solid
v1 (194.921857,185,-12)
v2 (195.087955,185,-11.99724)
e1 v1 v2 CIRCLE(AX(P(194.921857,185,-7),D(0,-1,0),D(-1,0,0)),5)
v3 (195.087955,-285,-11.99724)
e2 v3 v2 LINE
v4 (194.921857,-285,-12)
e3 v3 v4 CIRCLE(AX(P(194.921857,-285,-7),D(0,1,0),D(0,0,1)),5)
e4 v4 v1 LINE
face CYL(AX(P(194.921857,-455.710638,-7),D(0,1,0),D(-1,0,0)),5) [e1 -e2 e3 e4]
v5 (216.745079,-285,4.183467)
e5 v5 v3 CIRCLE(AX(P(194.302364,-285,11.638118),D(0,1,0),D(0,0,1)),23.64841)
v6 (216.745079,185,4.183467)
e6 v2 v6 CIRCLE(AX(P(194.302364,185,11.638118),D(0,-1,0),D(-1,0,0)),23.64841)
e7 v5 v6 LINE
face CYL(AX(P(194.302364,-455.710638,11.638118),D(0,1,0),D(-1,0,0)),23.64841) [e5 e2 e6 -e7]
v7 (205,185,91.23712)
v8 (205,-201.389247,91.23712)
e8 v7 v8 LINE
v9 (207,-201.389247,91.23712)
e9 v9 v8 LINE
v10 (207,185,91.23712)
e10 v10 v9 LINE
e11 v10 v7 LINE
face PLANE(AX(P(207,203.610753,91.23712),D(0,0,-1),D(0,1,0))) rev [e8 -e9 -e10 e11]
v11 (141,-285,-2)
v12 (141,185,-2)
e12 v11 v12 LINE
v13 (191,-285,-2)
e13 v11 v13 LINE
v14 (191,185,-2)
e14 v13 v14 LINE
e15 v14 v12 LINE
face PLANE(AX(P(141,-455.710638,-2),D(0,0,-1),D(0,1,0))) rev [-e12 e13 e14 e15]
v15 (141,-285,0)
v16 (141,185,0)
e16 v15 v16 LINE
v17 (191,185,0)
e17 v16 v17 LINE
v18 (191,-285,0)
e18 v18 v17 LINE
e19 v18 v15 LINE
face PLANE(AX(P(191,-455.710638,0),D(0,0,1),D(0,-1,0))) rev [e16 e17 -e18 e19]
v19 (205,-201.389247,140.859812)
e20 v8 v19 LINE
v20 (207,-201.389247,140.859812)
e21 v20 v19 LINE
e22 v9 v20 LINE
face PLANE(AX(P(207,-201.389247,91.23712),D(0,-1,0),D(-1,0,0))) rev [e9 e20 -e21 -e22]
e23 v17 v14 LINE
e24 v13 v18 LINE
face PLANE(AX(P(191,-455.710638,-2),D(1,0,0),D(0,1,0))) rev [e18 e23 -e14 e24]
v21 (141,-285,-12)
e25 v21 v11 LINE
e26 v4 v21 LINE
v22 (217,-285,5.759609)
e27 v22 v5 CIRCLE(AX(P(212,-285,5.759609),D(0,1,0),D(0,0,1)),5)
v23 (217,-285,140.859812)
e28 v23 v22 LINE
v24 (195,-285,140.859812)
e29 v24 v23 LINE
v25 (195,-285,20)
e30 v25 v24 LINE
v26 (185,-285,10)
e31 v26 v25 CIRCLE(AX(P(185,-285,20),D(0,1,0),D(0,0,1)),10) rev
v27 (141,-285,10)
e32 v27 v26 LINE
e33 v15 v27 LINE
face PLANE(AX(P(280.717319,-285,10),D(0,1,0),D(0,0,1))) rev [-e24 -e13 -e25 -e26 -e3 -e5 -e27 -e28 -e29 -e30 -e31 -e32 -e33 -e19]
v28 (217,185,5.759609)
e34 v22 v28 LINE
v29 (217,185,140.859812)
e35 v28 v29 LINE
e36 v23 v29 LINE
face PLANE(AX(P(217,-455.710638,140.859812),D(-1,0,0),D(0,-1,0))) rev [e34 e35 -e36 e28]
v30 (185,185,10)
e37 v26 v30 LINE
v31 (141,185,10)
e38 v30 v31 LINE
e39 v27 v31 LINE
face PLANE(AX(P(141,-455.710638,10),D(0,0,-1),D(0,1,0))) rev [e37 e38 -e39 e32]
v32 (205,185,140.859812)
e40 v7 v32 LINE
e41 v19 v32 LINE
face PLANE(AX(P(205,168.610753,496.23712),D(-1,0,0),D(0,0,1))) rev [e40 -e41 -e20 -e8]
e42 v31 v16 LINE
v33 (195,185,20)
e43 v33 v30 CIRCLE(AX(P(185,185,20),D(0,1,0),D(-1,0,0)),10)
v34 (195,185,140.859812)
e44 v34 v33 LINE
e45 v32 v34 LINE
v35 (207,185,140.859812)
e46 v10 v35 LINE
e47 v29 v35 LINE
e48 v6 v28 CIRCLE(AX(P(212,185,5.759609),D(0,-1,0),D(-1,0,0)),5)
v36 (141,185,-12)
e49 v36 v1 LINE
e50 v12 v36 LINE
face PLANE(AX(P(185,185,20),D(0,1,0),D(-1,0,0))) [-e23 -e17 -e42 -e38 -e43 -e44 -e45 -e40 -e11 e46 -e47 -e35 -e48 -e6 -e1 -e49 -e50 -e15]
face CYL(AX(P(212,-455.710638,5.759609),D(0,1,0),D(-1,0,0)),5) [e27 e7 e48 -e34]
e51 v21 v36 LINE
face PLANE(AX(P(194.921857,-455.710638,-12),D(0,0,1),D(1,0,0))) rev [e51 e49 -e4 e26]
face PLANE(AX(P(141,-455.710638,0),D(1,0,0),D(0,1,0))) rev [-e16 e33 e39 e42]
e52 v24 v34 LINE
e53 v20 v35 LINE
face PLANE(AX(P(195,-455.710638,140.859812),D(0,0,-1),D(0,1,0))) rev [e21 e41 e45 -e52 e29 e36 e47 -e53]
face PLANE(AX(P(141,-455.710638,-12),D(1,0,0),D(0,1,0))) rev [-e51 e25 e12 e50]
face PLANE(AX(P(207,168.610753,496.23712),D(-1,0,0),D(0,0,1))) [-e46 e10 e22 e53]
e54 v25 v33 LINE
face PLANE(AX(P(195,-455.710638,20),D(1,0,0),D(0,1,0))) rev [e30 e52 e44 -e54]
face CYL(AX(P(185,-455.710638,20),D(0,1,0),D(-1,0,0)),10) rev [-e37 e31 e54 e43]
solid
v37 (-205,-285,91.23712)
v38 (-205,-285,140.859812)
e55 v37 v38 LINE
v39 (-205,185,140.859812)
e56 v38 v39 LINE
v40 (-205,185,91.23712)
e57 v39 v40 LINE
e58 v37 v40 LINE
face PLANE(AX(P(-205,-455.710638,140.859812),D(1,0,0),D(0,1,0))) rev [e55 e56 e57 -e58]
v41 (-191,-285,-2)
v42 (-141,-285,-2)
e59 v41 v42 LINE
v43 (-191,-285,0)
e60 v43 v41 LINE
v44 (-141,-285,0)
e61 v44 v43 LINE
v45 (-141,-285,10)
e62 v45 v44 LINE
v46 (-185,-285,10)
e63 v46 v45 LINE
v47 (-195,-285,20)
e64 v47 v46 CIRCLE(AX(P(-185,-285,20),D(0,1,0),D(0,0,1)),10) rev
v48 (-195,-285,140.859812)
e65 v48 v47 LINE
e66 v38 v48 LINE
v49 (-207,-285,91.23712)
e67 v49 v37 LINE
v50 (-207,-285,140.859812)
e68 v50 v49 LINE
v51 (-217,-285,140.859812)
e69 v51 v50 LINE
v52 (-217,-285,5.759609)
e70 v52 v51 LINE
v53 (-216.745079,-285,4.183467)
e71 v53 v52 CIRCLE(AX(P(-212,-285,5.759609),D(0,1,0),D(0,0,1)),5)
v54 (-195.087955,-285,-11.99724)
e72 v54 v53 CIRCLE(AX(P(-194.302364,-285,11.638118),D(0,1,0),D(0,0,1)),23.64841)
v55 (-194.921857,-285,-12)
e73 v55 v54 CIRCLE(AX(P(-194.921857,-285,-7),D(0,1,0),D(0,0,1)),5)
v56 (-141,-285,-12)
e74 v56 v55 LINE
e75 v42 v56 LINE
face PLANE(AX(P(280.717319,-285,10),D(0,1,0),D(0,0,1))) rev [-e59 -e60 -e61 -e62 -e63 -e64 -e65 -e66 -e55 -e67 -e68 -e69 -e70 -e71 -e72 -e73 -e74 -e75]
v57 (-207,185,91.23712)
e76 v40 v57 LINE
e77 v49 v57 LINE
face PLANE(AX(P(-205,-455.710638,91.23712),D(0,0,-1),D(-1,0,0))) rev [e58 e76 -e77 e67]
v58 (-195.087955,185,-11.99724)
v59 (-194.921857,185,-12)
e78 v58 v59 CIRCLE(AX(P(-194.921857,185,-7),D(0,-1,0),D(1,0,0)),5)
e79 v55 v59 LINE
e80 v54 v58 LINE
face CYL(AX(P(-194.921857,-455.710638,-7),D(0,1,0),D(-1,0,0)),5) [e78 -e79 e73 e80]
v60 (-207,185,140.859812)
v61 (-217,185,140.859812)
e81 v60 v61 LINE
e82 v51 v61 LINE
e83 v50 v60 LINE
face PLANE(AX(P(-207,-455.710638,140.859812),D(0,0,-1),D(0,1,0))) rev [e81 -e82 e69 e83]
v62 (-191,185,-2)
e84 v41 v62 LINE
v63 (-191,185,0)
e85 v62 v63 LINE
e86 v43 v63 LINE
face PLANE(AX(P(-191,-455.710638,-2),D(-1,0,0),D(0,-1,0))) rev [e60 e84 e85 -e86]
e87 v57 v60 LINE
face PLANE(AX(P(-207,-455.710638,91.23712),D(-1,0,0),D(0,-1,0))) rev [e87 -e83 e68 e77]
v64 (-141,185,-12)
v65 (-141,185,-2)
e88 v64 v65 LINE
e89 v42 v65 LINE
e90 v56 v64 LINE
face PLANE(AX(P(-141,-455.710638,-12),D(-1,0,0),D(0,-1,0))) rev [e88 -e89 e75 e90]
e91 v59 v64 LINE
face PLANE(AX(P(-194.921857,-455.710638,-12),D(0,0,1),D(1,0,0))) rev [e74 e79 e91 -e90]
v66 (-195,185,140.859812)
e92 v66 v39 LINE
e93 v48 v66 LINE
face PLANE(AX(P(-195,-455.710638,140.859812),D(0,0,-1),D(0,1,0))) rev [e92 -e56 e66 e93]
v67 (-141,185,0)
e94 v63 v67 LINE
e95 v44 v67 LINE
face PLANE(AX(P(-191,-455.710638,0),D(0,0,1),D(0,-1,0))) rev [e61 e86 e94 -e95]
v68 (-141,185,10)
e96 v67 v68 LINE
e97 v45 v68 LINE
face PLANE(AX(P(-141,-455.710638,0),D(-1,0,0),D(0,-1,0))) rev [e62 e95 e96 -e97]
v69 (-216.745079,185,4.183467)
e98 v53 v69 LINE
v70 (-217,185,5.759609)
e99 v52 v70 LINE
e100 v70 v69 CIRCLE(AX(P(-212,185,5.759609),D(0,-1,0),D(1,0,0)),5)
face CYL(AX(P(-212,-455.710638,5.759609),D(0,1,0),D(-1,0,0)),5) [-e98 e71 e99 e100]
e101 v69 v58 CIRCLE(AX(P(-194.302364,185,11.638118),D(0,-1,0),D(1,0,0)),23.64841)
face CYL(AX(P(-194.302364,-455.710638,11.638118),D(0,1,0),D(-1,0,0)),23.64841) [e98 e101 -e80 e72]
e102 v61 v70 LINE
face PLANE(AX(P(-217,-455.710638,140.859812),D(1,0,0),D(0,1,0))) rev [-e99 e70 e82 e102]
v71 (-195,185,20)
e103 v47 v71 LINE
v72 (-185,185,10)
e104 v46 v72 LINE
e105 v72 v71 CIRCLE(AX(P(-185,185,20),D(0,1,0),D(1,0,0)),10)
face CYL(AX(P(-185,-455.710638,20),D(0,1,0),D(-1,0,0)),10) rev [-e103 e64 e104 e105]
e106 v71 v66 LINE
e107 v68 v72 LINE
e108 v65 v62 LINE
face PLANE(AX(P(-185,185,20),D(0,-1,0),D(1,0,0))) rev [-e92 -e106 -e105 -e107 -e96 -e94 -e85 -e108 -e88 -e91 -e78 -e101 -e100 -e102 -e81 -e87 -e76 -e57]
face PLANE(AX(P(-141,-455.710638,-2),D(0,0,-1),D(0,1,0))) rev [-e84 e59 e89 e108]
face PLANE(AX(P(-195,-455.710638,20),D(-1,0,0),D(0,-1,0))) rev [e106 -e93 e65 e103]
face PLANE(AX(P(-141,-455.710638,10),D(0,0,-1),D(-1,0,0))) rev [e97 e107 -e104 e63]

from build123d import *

# Parameters (mm, degrees)
BOSS_EXTRUDE1_DEPTH   = 470
BOSS_EXTRUDE1_2_DEPTH = 470
CAVITY1_START         = -201.389246797
CAVITY1_OUTLINE_W     = 2
CAVITY1_OUTLINE_H     = 49.622691928
CAVITY1_DEPTH         = 386.389246797


# Read off the part's stored shape, not the designer's step: Cavity1
with BuildPart() as part:
    # Sketch1 → Boss-Extrude1 (new body)
    with BuildSketch(Plane.XZ.offset(-185)):
        with BuildLine():
            Line((141, 0), (141, 10))
            Line((141, 10), (185, 10))
            ThreePointArc((185, 10), (192.071067812, 12.928932188), (195, 20))
            Line((195, 20), (195, 140.859811782))
            Line((195, 140.859811782), (217, 140.859811782))
            Line((217, 140.859811782), (217, 5.759608647))
            ThreePointArc((217, 5.759608647), (216.935858368, 4.961296569), (216.745079131, 4.183466508))
            ThreePointArc((216.745079131, 4.183466508), (208.456598854, -7.306668645), (195.087954648, -11.997240382))
            ThreePointArc((195.087954648, -11.997240382), (195.004917078, -11.999310048), (194.921856585, -12))
            Line((194.921856585, -12), (141, -12))
            Line((141, -12), (141, -2))
            Line((141, -2), (191, -2))
            Line((191, -2), (191, 0))
            Line((191, 0), (141, 0))
        make_face()
    extrude(amount=BOSS_EXTRUDE1_DEPTH)

    # Cavity1 outline → Cavity1 (cut)
    with BuildSketch(Plane(origin=(0, 0, 0), x_dir=(1, 0, 0), z_dir=(0, 1, 0)).offset(CAVITY1_START)):
        with Locations((206, -116.048465818)):
            Rectangle(CAVITY1_OUTLINE_W, CAVITY1_OUTLINE_H)
    extrude(amount=CAVITY1_DEPTH, mode=Mode.SUBTRACT)


with BuildPart() as body_2:
    # Sketch1 → Boss-Extrude1 2 (new body)
    with BuildSketch(Plane.XZ.offset(-185)):
        with BuildLine():
            Line((-141, 10), (-185, 10))
            ThreePointArc((-185, 10), (-192.071067812, 12.928932188), (-195, 20))
            Line((-195, 20), (-195, 140.859811782))
            Line((-195, 140.859811782), (-205, 140.859811782))
            Line((-205, 140.859811782), (-205, 91.237119854))
            Line((-205, 91.237119854), (-207, 91.237119854))
            Line((-207, 91.237119854), (-207, 140.859811782))
            Line((-207, 140.859811782), (-217, 140.859811782))
            Line((-217, 140.859811782), (-217, 5.759608647))
            ThreePointArc((-217, 5.759608647), (-216.935858368, 4.961296569), (-216.745079131, 4.183466508))
            ThreePointArc((-216.745079131, 4.183466508), (-208.456598854, -7.306668645), (-195.087954648, -11.997240382))
            ThreePointArc((-195.087954648, -11.997240382), (-195.004917078, -11.999310048), (-194.921856585, -12))
            Line((-194.921856585, -12), (-141, -12))
            Line((-141, -12), (-141, -2))
            Line((-141, -2), (-191, -2))
            Line((-191, -2), (-191, 0))
            Line((-191, 0), (-141, 0))
            Line((-141, 0), (-141, 10))
        make_face()
    extrude(amount=BOSS_EXTRUDE1_2_DEPTH)


solid = Compound([part.part, body_2.part])
